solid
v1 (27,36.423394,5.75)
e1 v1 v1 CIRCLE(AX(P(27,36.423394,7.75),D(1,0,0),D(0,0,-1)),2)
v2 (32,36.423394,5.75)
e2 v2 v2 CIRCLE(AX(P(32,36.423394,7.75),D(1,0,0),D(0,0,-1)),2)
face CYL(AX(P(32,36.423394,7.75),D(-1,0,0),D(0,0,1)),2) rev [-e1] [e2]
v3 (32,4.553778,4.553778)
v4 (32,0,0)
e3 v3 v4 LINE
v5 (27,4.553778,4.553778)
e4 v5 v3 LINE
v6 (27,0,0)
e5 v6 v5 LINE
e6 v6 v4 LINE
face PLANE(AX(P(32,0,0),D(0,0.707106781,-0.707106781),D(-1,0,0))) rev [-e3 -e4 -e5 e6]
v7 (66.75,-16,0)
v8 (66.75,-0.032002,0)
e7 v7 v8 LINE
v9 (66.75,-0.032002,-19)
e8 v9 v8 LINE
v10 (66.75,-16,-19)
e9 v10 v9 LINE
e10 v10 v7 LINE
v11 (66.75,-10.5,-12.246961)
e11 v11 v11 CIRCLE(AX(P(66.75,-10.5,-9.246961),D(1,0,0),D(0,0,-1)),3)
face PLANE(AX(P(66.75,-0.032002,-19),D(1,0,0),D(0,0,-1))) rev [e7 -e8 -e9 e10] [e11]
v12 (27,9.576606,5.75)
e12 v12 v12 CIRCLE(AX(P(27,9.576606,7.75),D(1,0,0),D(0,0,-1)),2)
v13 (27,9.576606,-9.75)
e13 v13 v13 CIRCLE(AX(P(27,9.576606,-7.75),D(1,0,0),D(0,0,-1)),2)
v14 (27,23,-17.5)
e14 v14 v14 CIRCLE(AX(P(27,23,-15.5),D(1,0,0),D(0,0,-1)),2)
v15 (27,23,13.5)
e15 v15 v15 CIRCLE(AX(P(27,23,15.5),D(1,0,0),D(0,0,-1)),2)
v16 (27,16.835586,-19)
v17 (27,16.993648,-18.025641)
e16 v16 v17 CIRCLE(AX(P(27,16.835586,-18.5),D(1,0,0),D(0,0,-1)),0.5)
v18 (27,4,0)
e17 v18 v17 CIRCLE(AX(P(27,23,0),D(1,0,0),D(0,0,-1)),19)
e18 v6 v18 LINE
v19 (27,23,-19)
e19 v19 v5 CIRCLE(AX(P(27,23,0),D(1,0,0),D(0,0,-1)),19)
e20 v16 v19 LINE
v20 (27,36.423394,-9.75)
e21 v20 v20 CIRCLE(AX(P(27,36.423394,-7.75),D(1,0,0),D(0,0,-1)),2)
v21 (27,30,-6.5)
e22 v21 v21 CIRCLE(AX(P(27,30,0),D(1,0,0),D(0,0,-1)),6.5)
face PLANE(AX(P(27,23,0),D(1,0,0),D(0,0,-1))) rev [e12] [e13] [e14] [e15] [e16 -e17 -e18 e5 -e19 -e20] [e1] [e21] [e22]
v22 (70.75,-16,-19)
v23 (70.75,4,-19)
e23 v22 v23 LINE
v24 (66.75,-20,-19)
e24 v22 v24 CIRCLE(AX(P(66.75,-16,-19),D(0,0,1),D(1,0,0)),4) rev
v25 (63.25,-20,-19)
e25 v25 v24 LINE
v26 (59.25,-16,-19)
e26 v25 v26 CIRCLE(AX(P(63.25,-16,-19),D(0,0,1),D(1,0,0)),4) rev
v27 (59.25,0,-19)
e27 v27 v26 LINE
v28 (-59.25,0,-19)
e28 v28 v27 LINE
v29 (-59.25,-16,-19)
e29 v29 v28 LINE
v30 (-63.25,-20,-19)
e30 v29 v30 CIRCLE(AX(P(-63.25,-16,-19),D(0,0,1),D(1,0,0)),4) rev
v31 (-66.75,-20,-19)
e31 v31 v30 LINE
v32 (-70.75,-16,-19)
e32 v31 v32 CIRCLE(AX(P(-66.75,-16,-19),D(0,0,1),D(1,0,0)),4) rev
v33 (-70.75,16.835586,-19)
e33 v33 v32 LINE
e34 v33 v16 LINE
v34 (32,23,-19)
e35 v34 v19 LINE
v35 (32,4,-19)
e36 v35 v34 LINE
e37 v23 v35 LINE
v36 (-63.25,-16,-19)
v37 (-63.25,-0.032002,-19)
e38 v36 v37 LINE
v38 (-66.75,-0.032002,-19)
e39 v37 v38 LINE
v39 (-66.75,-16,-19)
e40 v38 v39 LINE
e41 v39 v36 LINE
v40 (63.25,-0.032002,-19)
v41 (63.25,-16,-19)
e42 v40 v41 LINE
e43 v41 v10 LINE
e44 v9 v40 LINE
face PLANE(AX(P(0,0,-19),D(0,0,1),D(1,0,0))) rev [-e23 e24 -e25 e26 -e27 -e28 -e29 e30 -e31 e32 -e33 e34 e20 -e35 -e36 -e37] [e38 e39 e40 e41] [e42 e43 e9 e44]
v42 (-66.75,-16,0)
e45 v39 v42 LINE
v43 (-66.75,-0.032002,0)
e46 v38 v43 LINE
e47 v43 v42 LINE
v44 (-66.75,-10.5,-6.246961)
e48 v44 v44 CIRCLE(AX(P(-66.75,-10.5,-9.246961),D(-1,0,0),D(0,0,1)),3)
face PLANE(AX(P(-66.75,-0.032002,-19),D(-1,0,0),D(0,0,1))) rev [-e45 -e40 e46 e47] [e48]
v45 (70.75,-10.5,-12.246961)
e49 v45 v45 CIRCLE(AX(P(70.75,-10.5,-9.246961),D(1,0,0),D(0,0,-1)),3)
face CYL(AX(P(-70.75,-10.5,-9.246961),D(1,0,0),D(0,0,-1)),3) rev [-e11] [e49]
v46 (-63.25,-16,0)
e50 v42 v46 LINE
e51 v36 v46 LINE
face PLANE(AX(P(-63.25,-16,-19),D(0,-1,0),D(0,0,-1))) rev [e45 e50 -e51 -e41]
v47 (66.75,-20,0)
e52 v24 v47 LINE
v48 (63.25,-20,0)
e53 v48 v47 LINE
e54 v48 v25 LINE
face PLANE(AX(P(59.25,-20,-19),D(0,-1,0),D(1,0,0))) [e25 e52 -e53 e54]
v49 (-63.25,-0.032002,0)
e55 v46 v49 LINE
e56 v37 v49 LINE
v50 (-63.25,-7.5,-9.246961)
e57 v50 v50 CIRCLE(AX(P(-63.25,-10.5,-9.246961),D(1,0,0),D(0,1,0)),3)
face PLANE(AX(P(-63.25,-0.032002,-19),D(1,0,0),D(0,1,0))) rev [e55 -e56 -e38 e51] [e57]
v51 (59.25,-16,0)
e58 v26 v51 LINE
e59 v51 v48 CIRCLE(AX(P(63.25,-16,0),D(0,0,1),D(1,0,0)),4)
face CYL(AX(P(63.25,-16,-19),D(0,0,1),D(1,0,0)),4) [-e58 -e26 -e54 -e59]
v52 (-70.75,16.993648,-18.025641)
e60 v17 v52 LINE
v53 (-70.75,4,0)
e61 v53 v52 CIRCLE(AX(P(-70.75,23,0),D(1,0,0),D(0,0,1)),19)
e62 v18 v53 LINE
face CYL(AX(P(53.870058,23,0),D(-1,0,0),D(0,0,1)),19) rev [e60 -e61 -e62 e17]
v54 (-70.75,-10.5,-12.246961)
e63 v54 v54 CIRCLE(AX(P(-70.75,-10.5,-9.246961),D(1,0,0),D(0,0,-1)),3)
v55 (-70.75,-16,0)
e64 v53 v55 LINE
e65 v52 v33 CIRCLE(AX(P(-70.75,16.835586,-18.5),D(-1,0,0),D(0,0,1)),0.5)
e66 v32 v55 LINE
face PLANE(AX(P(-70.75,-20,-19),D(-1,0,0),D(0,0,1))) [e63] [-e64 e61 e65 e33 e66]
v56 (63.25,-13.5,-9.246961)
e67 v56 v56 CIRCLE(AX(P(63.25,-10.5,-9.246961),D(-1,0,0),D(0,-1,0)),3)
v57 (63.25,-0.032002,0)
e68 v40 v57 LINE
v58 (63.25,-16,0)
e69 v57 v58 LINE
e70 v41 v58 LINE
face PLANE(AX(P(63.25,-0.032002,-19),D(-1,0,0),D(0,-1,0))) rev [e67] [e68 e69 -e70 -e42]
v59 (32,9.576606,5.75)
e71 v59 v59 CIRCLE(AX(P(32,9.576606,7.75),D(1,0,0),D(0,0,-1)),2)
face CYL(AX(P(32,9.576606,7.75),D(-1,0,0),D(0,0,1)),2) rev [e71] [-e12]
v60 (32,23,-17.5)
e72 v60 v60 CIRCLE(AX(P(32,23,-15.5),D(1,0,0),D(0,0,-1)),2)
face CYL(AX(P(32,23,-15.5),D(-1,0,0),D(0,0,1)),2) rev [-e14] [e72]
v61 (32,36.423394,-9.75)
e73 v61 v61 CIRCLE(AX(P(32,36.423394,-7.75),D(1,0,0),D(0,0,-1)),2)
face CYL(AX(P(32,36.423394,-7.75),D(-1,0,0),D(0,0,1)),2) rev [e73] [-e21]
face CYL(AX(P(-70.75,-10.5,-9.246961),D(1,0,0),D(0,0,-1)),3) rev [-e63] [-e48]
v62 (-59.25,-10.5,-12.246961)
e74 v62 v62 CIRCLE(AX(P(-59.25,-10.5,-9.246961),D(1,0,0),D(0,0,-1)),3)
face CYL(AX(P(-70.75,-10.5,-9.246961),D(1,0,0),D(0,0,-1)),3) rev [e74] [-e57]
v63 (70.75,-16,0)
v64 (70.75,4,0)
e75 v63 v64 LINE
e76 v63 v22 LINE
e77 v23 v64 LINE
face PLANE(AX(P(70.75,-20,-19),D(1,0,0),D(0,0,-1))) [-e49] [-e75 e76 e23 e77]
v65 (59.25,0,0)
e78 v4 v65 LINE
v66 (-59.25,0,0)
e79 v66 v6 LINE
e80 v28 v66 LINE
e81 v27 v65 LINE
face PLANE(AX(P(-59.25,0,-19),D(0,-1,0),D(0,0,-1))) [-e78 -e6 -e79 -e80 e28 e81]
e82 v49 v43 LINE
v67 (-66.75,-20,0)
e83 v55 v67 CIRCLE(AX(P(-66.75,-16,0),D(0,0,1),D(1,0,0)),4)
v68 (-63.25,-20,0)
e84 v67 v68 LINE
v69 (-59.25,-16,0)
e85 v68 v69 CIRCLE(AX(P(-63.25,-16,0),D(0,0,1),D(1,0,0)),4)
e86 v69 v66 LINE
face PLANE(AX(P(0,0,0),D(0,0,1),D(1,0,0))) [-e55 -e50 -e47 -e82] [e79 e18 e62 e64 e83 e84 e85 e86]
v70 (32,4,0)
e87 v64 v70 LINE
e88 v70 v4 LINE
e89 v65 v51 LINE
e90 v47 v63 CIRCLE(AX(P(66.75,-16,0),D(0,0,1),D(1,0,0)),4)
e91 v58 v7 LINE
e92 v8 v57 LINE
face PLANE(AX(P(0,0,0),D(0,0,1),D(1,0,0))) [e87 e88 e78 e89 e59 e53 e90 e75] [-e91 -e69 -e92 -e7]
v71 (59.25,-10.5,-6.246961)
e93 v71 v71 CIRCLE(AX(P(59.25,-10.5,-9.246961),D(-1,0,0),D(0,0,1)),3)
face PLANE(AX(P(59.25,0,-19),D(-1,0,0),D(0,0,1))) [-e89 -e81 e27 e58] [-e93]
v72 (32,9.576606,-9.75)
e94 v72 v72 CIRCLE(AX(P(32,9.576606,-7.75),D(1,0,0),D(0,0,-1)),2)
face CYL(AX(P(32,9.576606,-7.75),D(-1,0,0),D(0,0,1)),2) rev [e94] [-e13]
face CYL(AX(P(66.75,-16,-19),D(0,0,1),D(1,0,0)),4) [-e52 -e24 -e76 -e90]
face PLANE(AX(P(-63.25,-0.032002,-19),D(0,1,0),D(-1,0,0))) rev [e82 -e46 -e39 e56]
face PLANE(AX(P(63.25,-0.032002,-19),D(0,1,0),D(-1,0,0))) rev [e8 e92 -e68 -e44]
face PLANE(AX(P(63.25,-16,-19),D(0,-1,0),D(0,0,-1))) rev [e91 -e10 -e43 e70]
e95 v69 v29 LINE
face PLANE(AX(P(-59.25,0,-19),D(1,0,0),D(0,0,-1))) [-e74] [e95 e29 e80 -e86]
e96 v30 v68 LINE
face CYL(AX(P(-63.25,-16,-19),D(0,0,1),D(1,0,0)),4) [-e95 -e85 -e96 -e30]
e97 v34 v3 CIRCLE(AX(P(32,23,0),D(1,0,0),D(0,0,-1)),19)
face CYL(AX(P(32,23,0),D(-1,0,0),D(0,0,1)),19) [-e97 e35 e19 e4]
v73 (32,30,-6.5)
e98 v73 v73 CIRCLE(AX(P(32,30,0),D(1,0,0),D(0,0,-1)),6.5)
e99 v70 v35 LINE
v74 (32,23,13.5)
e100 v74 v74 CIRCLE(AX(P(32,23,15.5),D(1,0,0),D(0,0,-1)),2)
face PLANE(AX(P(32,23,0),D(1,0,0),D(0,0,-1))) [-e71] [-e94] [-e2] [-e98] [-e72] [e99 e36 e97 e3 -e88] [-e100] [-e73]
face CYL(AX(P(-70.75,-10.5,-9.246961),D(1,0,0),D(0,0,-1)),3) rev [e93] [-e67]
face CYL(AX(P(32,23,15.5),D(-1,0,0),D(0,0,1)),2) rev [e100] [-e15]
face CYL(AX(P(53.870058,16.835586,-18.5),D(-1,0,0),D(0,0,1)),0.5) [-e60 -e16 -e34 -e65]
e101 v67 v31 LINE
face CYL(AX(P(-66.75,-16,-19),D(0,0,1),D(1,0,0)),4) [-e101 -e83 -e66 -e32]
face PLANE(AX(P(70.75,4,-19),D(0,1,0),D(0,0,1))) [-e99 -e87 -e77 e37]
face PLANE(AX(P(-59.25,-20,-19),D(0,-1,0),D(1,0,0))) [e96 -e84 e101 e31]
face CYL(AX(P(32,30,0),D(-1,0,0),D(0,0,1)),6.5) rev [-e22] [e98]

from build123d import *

# Parameters (mm, degrees)
SKETCH1_W               = 3.5
SKETCH1_H               = 15.967998052
BOSS_EXTRUDE1_DEPTH     = 19
BOSS_EXTRUDE2_START     = 27
SKETCH2_R               = 6.5
SKETCH2_R_2             = 2
BOSS_EXTRUDE2_DEPTH     = 5
BOSS_EXTRUDE3_DEPTH     = 97.75
FILLET1_START           = -72
FILLET1_DEPTH           = 99
CUT_EXTRUDE1_DEPTH      = 85.442658059
CUT_EXTRUDE1_DEPTH_BACK = 85.442658059
SKETCH4_R               = 3
CHAMFER1_SIZE           = 4
FILLET3_R               = 4


with BuildPart() as part:
    # Sketch1 → Boss-Extrude1 (new body)
    with BuildSketch(Plane.XY):
        Polygon((-59.25, 0), (59.25, 0), (59.25, -20), (70.75, -20), (70.75, 4), (-70.75, 4), (-70.75, -20), (-59.25, -20), align=None)
        with Locations((65, -8.016000974)):
            Rectangle(SKETCH1_W, SKETCH1_H, mode=Mode.SUBTRACT)
        with Locations((-65, -8.016000974)):
            Rectangle(SKETCH1_W, SKETCH1_H, mode=Mode.SUBTRACT)
    extrude(amount=-BOSS_EXTRUDE1_DEPTH)

    # Sketch2 → Boss-Extrude2 (add)
    with BuildSketch(Plane(origin=(0, 0, 0), x_dir=(0, 0, -1), z_dir=(1, 0, 0)).offset(BOSS_EXTRUDE2_START)):
        with BuildLine():
            Line((19, 4), (19, 23))
            ThreePointArc((19, 23), (-13.435028843, 36.435028843), (0, 4))
            Line((0, 4), (19, 4))
        make_face()
        with Locations((0, 30)):
            Circle(SKETCH2_R, mode=Mode.SUBTRACT)
        with Locations((15.5, 23)):
            Circle(SKETCH2_R_2, mode=Mode.SUBTRACT)
        with Locations((7.75, 9.576606241)):
            Circle(SKETCH2_R_2, mode=Mode.SUBTRACT)
        with Locations((-7.75, 9.576606241)):
            Circle(SKETCH2_R_2, mode=Mode.SUBTRACT)
        with Locations((-15.5, 23)):
            Circle(SKETCH2_R_2, mode=Mode.SUBTRACT)
        with Locations((-7.75, 36.423393759)):
            Circle(SKETCH2_R_2, mode=Mode.SUBTRACT)
        with Locations((7.75, 36.423393759)):
            Circle(SKETCH2_R_2, mode=Mode.SUBTRACT)
    extrude(amount=BOSS_EXTRUDE2_DEPTH)

    # Sketch3 → Boss-Extrude3 (add)
    with BuildSketch(Plane.ZY.offset(70.75)):
        with BuildLine():
            Line((0, 4), (-19, 4))
            Line((-19, 4), (-19, 23))
            ThreePointArc((-19, 23), (-13.435028843, 9.564971157), (0, 4))
        make_face()
    extrude(amount=-BOSS_EXTRUDE3_DEPTH)

    # Fillet1: read off the stored shape, not the designer's step
    # Fillet1 outline → Fillet1 (cut)
    with BuildSketch(Plane.YZ.offset(FILLET1_START)):
        with BuildLine():
            ThreePointArc((23, -19), (19.957565078, -18.754828438), (16.993647895, -18.025641026))
            ThreePointArc((16.993647895, -18.025641026), (17.329134114, -18.580064077), (16.835585997, -19))
            Line((16.835585997, -19), (23, -19))
        make_face()
    extrude(amount=FILLET1_DEPTH, mode=Mode.SUBTRACT)

    # Sketch4 → Cut-Extrude1 (cut, two sides: drawn at the far end of the back side and taken through both)
    with BuildSketch(Plane(origin=(0, 0, 0), x_dir=(0, 0, -1), z_dir=(1, 0, 0)).offset(-CUT_EXTRUDE1_DEPTH_BACK)):
        with Locations((9.246961263, -10.5)):
            Circle(SKETCH4_R)
    extrude(amount=CUT_EXTRUDE1_DEPTH + CUT_EXTRUDE1_DEPTH_BACK, mode=Mode.SUBTRACT)

    # Chamfer1
    # the kernel refuses this chamfer: 4 mm, written as the material it adds along each edge
    with BuildSketch(Plane(origin=(27, 4, 0), x_dir=(0, -1, 0), z_dir=(1, 0, 0))) as chamfer1_piece_1:
        with BuildLine():
            Line((CHAMFER1_SIZE, 0), (-0.553778005, -4.553778005))
            ThreePointArc((-0.553778005, -4.553778005), (-0.146737714, -2.356798922), (0, 0))
            Line((0, 0), (CHAMFER1_SIZE, 0))
        make_face()
    extrude(amount=5)

    # Fillet3
    fillet3_edges = [part.edges().sort_by_distance(p)[0] for p in [
        (59.25, -20, -9.5),
        (-59.25, -20, -9.5),
        (-70.75, -20, -9.5),
        (70.75, -20, -9.5),
    ]]
    fillet(fillet3_edges, radius=FILLET3_R)


solid = part.part
